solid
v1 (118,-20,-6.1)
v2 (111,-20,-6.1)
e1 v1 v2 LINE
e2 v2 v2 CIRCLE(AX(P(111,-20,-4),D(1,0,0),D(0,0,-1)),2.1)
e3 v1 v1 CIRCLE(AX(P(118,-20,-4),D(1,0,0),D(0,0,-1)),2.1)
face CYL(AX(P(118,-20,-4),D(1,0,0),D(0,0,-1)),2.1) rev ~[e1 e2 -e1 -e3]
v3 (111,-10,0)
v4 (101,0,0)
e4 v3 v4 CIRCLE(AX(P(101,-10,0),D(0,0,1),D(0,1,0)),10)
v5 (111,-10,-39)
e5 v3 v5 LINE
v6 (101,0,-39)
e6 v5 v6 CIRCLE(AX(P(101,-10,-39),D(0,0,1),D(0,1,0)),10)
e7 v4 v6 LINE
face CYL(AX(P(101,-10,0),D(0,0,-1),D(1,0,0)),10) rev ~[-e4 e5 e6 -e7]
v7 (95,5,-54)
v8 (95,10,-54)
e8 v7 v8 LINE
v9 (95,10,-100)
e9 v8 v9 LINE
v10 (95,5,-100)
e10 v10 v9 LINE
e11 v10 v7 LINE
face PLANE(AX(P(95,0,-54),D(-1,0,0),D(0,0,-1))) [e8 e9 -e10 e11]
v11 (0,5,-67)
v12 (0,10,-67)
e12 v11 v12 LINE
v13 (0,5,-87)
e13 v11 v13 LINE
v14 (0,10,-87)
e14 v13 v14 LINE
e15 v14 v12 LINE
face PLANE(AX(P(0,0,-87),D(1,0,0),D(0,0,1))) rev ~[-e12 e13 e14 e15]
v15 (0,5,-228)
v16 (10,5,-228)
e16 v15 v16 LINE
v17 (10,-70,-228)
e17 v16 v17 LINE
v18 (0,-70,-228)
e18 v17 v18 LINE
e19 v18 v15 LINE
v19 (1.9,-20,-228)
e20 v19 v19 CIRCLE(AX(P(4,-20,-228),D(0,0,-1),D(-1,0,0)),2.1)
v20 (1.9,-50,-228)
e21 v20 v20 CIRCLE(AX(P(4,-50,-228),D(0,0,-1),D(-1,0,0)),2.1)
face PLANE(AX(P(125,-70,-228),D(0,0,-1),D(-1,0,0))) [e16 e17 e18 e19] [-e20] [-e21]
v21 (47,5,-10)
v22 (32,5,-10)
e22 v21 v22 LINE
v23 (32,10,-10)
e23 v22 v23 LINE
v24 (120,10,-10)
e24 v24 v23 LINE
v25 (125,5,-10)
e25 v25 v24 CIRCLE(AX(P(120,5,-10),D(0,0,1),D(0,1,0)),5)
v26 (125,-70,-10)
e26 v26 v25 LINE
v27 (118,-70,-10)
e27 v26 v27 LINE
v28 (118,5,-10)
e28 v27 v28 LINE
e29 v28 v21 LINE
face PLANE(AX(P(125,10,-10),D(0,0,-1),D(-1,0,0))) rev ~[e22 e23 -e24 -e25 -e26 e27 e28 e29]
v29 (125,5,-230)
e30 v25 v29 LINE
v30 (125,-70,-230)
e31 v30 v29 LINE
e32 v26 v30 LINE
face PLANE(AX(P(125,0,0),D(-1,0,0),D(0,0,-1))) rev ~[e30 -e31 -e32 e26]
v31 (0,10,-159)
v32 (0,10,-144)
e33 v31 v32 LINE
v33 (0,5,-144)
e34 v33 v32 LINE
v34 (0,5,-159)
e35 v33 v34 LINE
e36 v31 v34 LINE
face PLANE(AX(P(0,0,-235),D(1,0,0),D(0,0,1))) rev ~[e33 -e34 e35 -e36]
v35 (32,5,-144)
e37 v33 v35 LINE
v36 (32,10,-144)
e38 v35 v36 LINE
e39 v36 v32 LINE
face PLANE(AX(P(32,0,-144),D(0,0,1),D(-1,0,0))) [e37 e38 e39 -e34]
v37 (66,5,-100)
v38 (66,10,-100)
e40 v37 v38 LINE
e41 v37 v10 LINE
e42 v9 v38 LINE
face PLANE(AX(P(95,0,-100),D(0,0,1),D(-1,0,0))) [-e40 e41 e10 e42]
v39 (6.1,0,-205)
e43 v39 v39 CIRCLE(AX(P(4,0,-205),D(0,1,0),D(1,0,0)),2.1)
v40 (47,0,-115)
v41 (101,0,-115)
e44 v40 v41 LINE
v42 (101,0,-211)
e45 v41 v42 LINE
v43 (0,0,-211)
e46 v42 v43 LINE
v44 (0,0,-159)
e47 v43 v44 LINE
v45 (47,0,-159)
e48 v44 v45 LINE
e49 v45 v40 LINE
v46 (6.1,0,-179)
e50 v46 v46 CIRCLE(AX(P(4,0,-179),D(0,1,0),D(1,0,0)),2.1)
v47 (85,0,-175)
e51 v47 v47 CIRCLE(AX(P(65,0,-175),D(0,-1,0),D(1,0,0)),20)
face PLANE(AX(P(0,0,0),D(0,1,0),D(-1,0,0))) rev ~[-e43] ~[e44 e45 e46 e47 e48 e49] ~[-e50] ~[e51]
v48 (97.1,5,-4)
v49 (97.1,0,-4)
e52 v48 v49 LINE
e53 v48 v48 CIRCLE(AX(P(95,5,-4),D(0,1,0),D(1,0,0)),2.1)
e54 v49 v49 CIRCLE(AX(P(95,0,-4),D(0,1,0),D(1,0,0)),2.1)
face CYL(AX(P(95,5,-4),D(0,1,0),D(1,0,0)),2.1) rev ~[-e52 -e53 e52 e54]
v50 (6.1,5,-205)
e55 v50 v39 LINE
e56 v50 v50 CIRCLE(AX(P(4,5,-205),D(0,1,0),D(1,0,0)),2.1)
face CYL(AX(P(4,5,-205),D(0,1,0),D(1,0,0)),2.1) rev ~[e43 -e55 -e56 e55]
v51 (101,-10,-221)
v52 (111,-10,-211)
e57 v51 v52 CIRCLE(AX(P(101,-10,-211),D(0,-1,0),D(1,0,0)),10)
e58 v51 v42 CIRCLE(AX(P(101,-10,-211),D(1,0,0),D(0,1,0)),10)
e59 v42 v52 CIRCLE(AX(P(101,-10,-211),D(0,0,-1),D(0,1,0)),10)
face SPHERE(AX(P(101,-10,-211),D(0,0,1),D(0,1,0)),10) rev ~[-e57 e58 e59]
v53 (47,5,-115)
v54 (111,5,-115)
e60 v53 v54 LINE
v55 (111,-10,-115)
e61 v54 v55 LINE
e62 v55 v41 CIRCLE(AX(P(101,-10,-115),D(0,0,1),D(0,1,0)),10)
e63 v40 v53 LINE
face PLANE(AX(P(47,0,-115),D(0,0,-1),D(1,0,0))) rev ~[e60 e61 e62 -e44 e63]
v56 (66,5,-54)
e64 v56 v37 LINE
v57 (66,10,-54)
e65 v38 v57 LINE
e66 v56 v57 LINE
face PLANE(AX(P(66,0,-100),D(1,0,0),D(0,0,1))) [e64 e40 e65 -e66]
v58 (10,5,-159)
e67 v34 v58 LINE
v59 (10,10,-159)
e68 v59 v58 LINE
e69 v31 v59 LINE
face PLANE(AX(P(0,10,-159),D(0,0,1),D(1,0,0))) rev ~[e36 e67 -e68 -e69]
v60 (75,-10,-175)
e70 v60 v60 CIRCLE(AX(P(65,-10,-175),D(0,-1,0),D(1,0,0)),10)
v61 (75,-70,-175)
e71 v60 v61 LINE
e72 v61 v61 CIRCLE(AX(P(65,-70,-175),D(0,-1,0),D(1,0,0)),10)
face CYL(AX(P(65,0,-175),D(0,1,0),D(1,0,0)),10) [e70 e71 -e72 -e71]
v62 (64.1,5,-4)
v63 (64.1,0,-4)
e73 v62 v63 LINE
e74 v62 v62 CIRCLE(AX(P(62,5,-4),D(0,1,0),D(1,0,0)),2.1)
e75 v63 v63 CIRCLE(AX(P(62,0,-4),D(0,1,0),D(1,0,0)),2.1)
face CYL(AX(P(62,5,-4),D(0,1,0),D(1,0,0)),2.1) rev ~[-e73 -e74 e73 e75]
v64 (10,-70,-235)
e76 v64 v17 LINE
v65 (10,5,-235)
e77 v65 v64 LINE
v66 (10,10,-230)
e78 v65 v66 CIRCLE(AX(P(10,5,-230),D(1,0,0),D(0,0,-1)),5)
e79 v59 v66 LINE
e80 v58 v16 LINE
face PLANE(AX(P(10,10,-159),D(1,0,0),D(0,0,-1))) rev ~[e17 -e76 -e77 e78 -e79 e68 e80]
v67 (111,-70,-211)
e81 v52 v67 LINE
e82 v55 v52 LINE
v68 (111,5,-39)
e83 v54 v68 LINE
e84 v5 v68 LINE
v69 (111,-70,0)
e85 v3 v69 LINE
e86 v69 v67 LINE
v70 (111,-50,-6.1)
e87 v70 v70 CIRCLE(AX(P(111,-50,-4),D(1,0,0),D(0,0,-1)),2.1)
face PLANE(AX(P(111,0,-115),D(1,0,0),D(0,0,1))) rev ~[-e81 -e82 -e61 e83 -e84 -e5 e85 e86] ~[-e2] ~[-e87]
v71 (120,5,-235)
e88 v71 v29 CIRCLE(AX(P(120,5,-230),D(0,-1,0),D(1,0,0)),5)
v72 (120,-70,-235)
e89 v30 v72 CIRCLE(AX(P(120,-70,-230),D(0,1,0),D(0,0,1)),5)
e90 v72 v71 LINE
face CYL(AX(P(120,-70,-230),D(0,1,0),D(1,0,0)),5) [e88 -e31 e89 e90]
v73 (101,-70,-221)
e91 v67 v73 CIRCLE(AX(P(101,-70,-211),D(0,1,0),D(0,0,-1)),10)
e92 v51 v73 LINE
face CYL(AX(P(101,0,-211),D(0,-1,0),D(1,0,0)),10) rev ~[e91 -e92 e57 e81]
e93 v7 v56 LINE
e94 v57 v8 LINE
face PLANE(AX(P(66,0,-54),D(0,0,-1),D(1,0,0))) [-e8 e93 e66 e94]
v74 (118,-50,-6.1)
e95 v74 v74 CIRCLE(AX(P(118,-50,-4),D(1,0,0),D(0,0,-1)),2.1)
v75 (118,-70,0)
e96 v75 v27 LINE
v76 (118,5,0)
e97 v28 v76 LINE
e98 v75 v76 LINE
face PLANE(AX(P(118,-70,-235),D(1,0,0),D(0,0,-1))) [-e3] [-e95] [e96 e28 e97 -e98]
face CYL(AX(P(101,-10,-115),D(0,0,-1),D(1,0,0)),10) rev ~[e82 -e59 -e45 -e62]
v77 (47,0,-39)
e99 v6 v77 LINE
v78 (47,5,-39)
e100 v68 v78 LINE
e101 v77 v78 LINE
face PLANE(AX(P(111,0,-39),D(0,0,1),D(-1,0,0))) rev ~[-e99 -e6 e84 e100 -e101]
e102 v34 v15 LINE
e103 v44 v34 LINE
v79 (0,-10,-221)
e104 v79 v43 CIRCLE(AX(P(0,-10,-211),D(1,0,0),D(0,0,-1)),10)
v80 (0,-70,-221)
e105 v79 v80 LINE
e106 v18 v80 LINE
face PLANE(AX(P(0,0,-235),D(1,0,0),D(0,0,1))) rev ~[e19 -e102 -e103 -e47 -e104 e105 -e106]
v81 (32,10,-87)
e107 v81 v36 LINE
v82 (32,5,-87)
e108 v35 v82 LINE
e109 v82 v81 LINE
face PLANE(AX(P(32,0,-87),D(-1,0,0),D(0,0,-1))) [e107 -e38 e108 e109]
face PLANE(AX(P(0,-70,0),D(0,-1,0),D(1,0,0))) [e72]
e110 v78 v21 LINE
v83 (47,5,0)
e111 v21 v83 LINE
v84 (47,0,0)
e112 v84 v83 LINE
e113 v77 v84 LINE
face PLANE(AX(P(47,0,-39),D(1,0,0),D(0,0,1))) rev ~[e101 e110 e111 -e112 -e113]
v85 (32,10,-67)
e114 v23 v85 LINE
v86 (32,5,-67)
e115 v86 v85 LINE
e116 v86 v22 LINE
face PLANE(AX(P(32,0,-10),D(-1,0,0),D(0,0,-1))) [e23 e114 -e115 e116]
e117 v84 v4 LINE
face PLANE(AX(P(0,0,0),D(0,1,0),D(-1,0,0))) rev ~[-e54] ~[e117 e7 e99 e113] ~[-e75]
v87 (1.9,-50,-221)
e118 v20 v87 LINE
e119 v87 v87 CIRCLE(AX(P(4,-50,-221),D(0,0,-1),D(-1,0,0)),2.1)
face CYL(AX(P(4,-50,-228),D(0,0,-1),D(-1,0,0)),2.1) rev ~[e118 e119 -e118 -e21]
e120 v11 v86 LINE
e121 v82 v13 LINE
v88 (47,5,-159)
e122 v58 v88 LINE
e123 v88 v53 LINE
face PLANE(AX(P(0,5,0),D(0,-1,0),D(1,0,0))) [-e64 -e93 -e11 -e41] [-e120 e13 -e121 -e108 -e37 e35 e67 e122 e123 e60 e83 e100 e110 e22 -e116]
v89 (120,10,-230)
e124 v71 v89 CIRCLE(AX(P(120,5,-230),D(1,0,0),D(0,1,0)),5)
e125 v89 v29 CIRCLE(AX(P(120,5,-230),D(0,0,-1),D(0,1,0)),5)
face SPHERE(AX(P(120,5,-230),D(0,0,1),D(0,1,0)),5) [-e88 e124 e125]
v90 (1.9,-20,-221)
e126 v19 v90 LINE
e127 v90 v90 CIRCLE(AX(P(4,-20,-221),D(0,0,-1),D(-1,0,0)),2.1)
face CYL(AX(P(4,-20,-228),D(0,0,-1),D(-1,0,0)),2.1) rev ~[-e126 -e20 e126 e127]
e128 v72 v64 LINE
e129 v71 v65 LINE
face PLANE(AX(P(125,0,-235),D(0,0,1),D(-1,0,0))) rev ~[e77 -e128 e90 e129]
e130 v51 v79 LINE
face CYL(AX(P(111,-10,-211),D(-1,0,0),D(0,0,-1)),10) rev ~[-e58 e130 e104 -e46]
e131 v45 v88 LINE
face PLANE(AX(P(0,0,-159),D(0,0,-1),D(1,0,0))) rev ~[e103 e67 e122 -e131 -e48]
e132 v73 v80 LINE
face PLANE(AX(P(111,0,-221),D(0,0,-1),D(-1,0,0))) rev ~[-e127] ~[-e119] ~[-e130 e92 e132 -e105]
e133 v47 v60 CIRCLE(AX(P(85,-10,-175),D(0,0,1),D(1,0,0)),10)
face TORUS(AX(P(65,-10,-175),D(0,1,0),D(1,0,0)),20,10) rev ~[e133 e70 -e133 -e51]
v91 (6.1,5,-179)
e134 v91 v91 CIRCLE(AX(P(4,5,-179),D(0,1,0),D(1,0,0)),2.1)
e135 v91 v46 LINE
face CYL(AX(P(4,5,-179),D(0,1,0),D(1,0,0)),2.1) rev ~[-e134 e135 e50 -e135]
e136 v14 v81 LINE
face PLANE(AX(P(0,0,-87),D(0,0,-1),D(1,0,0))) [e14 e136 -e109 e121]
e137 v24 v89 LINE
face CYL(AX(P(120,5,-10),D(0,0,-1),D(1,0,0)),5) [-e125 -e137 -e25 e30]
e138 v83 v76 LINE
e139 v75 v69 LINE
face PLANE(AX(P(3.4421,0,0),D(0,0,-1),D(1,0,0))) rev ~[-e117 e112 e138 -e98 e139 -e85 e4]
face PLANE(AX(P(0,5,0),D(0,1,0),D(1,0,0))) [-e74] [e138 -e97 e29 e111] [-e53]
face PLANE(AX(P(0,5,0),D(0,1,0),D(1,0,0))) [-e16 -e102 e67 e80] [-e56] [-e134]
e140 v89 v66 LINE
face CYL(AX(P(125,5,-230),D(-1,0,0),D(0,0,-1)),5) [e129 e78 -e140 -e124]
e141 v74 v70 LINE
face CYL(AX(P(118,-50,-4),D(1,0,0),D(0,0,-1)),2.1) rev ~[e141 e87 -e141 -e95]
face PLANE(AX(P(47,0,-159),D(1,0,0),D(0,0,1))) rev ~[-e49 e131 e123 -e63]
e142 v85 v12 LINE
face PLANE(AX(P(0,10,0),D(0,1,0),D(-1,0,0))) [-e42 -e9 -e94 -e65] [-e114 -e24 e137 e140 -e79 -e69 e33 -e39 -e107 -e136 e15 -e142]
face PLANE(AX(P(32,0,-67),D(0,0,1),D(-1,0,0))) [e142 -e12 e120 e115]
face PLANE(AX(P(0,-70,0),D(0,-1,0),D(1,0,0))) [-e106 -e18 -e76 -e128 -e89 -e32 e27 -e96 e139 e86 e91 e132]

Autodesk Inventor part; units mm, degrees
ref_plane "YZ Plane" through (0, 0, 0) normal (1, 0, 0) x (0, 1, 0)
ref_plane "XZ Plane" through (0, 0, 0) normal (0, 1, 0) x (-1, 0, 0)
ref_plane "XY Plane" through (0, 0, 0) normal (0, 0, 1) x (1, 0, 0)
sketch "草图7" plane through (0, 0, 0) normal (0, 1, 0) x (-1, 0, 0)
  line L0 (125, 235) -> (-125, 235)
  line L1 (-125, 235) -> (-125, -235)
  line L2 (-125, -235) -> (125, -235)
  line L3 (125, -235) -> (125, 235)
  line L4 (0, 3) -> (0, -5)
  line L5 (3.5058, 0) -> (-3.4421, 0)
  line L6 (25, 144) -> (-32, 144)
  line L7 (-32, 144) -> (-32, 87)
  line L8 (-32, 87) -> (25, 87)
  line L9 (25, 87) -> (25, 144)
  line L10 (25, 67) -> (-32, 67)
  line L11 (-32, 67) -> (-32, 10)
  line L12 (-32, 10) -> (25, 10)
  line L13 (25, 10) -> (25, 67)
  line L14 (25, -10) -> (-32, -10)
  line L15 (-32, -10) -> (-32, -67)
  line L16 (-32, -67) -> (25, -67)
  line L17 (25, -67) -> (25, -10)
  line L18 (25, -87) -> (-32, -87)
  line L19 (-32, -87) -> (-32, -144)
  line L20 (-32, -144) -> (25, -144)
  line L21 (25, -144) -> (25, -87)
  line L22 (-66, 100) -> (-95, 100)
  line L23 (-95, 100) -> (-95, 54)
  line L24 (-95, 54) -> (-66, 54)
  line L25 (-66, 54) -> (-66, 100)
  line L26 (-66, -54) -> (-95, -54)
  line L27 (-95, -54) -> (-95, -100)
  line L28 (-95, -100) -> (-66, -100)
  line L29 (-66, -100) -> (-66, -54)
  line L30 (100, 15) -> (70, 15)
  line L31 (70, 15) -> (70, -15)
  line L32 (70, -15) -> (100, -15)
  line L33 (100, -15) -> (100, 15)
  circle A0 centre (65, 182) radius 10
  circle A1 centre (65, -182) radius 10
  circle A2 centre (65, 182) radius 15
  circle A3 centre (80, 182) radius 1.5
  circle A4 centre (57.5, 194.9904) radius 1.5
  circle A5 centre (57.5, 169.0096) radius 1.5
  line L34 (125, 235) -> (0, 235)
  line L35 (0, 235) -> (0, 0)
  line L36 (0, 0) -> (125, 0)
  line L37 (125, 0) -> (125, 235)
  line L38 (-125, 235) -> (0, 235)
  line L39 (0, 235) -> (0, 0)
  line L40 (0, 0) -> (-125, 0)
  line L41 (-125, 0) -> (-125, 235)
  line L42 (-125, -235) -> (0, -235)
  line L43 (0, -235) -> (0, 0)
  line L44 (0, 0) -> (-125, 0)
  line L45 (-125, 0) -> (-125, -235)
  line L46 (125, -235) -> (0, -235)
  line L47 (0, -235) -> (0, 0)
  line L48 (0, 0) -> (125, 0)
  line L49 (125, 0) -> (125, -235)
  circle A6 centre (65, -182) radius 15
  circle A7 centre (80, -182) radius 1.5
  circle A8 centre (57.5, -169.0096) radius 1.5
  circle A9 centre (57.5, -194.9904) radius 1.5
  point P0 (0, -87)
  point P1 (0, -67)
  point P2 (0, -10)
  point P3 (0, -235)
  point P4 (0, -144)
  dimension "d115" = 30
  dimension "d118" = 30
  dimension "d84" = 470
  dimension "d85" = 250
  dimension "d86" = 57
  dimension "d87" = 57
  dimension "d88" = 57
  dimension "d89" = 57
  dimension "d90" = 57
  dimension "d91" = 57
  dimension "d92" = 57
  dimension "d93" = 57
  dimension "d94" = 91
  dimension "d95" = 20
  dimension "d96" = 20
  dimension "d97" = 20
  dimension "d98" = 93
  dimension "d99" = 29
  dimension "d100" = 46
  dimension "d101" = 46
  dimension "d102" = 135
  dimension "d103" = 108
  dimension "d104" = 30
  dimension "d105" = 30
  dimension "d106" = 30
  dimension "d107" = 25
  dimension "d108" = 220
  dimension "d109" = 20
  dimension "d110" = 53
  dimension "d111" = 60
  dimension "d112" = 20
  dimension "d113" = 53
  dimension "d114" = 60
  dimension "d116" = 3
  dimension "d117" = 360
  dimension "d119" = 3
  dimension "d120" = 360
extrude "拉伸7" add sketch "草图7" along normal blind 10 contours L40 L5 L4 L43 L14 L15 L16 L18 L19 L20 L2 L1
sketch "草图8" plane through (0, 0, 0) normal (0, -1, 0) x (1, 0, 0)
  line L0 (0, 0) -> (125, 0) projected
  line L1 (0, -235) -> (0, -144) projected
  line L2 (47, 0) -> (0, 0)
  line L3 (0, 0) -> (0, -159)
  line L4 (0, -159) -> (47, -159)
  line L5 (47, -159) -> (47, 0)
  line L6 (32, -67) -> (32, -10) projected
  line L7 (0, -144) -> (32, -144) projected
  line L8 (111, -39) -> (47, -39)
  line L9 (47, -39) -> (47, -115)
  line L10 (47, -115) -> (111, -115)
  line L11 (111, -115) -> (111, -39)
  line L12 (95, -54) -> (66, -54) projected
  line L13 (66, -100) -> (95, -100) projected
  line L14 (95, -100) -> (95, -54) projected
  line L15 (66, -54) -> (66, -100) projected
  dimension "d123" = 15
  dimension "d124" = 15
  dimension "d125" = 15
  dimension "d126" = 15
  dimension "d127" = 16
  dimension "d128" = 19
extrude "拉伸8" cut sketch "草图8" against normal blind 5
sketch "草图9" plane through (0, 0, 0) normal (0, -1, 0) x (1, 0, 0)
  line L0 (125, -235) -> (0, -235) projected
  line L1 (125, 0) -> (111, 0)
  line L2 (111, 0) -> (111, -235)
  line L3 (111, -235) -> (125, -235)
  line L4 (125, -235) -> (125, 0)
  line L5 (0, -235) -> (0, -159) projected
  line L6 (125, 0) -> (125, -235) projected
  line L7 (0, -235) -> (125, -235)
  line L8 (125, -235) -> (125, -221)
  line L9 (125, -221) -> (0, -221)
  line L10 (0, -221) -> (0, -235)
  point P0 (0, 0)
  point P1 (111, -221)
  dimension "d131" = 14
  dimension "d132" = 14
extrude "拉伸9" add sketch "草图9" along normal blind 70
sketch "草图10" plane through (0, 10, 0) normal (0, 1, 0) x (1, 0, 0)
  line L0 (0, 221) -> (0, 159) projected
  line L1 (125, 235) -> (0, 235) projected
  line L2 (0, 159) -> (10, 159)
  line L3 (10, 159) -> (10, 235)
  line L4 (10, 235) -> (0, 235)
  line L5 (0, 235) -> (0, 159)
  point P0 (0, 0)
  dimension "d135" = 10
extrude "拉伸10" cut sketch "草图10" against normal blind 5
sketch "草图11" plane through (0, 5, 0) normal (0, 1, 0) x (1, 0, 0)
  circle A0 centre (4, 179) radius 2.1
  circle A1 centre (4, 205) radius 2.1
  line L0 (0, 159) -> (0, 235) projected
  line L1 (10, 159) -> (0, 159) projected
  line L2 (125, 235) -> (10, 235) projected
  point P0 (0, 0)
  dimension "d138" = 4.2
  dimension "d139" = 4.2
  dimension "d140" = 4
  dimension "d141" = 4
  dimension "d142" = 20
  dimension "d143" = 30
extrude "拉伸11" cut sketch "草图11" against normal blind 5
sketch "草图12" plane through (125, -70, -235) normal (0, 0, -1) x (-1, 0, 0)
  line L0 (125, 0) -> (125, 75) projected
  line L1 (14, 0) -> (125, 0) projected
  line L2 (125, 75) -> (115, 75)
  line L3 (115, 75) -> (115, 0)
  line L4 (115, 0) -> (125, 0)
  line L5 (125, 0) -> (125, 75)
  point P0 (125, 70)
  dimension "d146" = 10
extrude "拉伸12" cut sketch "草图12" against normal blind 7
sketch "草图13" plane through (125, -70, -228) normal (0, 0, -1) x (-1, 0, 0)
  circle A0 centre (121, 50) radius 2.1
  circle A1 centre (121, 20) radius 2.1
  line L0 (125, 75) -> (125, 0) projected
  line L1 (115, 0) -> (0, 0) projected
  line L2 (0, 80) -> (115, 80) projected
  point P0 (125, 70)
  dimension "d149" = 4.2
  dimension "d150" = 4.2
  dimension "d151" = 4
  dimension "d152" = 4
  dimension "d153" = 20
  dimension "d154" = 30
extrude "拉伸13" cut sketch "草图13" against normal blind 7
fillet "圆角2" radius 10 4 edges at (111, 0, -19.5) (111, 0, -168) (55.5, 0, -221) (111, -35, -221)
sketch "草图14" plane through (0, 0, 0) normal (0, -1, 0) x (1, 0, 0)
  circle A0 centre (65, -175) radius 10
  line L0 (125, -235) -> (125, 0) projected
  line L1 (10, -235) -> (125, -235) projected
  point P0 (0, 0)
  point P1 (125, -230)
  point P2 (120, -235)
  dimension "d159" = 20
  dimension "d160" = 60
  dimension "d161" = 60
extrude "拉伸14" add sketch "草图14" along normal blind 70
fillet "圆角3" radius 10 1 edges at (55, 0, -175)
sketch "草图16" plane through (0, 10, 0) normal (0, 1, 0) x (1, 0, 0)
  line L0 (125, 0) -> (125, 235) projected
  line L1 (0, 0) -> (125, 0)
  line L2 (125, 0) -> (125, 10)
  line L3 (125, 10) -> (0, 10)
  line L4 (0, 10) -> (0, 0)
  dimension "d167" = 10
extrude "拉伸16" cut sketch "草图16" against normal blind 5
sketch "草图17" plane through (0, 5, 0) normal (0, 1, 0) x (1, 0, 0)
  circle A0 centre (62, 4) radius 2.1
  circle A1 centre (95, 4) radius 2.1
  line L0 (125, 0) -> (47, 0) projected
  line L1 (32, 67) -> (32, 10) projected
  line L2 (125, 10) -> (125, 235) projected
  point P0 (0, 0)
  dimension "d170" = 4.2
  dimension "d171" = 4.2
  dimension "d172" = 4
  dimension "d173" = 4
  dimension "d174" = 30
  dimension "d175" = 30
extrude "拉伸17" cut sketch "草图17" against normal blind 5
sketch "草图18" plane through (125, -70, -235) normal (1, 0, 0) x (0, 0, -1)
  line L0 (-235, 60) -> (-235, 0) projected
  line L1 (-225, 75) -> (-235, 75)
  line L2 (-235, 75) -> (-235, 0)
  line L3 (-235, 0) -> (-225, 0)
  line L4 (-225, 0) -> (-225, 75)
  point P0 (-235, 70)
extrude "拉伸18" cut sketch "草图18" against normal blind 7
sketch "草图19" plane through (118, -70, -235) normal (1, 0, 0) x (0, 0, -1)
  circle A0 centre (-231, 50) radius 2.1
  circle A1 centre (-231, 20) radius 2.1
  line L0 (-235, 0) -> (-235, 75) projected
  line L1 (0, 0) -> (-225, 0) projected
  line L2 (-225, 80) -> (0, 80) projected
  point P0 (-235, 70)
  dimension "d180" = 4.2
  dimension "d181" = 4.2
  dimension "d182" = 4
  dimension "d183" = 4
  dimension "d184" = 20
  dimension "d185" = 30
extrude "拉伸19" cut sketch "草图19" against normal blind 7
fillet "圆角4" radius 5 3 edges at (125, 10, -122.5) (67.5, 10, -235) (125, -30, -235)
properties part number "top_4"
